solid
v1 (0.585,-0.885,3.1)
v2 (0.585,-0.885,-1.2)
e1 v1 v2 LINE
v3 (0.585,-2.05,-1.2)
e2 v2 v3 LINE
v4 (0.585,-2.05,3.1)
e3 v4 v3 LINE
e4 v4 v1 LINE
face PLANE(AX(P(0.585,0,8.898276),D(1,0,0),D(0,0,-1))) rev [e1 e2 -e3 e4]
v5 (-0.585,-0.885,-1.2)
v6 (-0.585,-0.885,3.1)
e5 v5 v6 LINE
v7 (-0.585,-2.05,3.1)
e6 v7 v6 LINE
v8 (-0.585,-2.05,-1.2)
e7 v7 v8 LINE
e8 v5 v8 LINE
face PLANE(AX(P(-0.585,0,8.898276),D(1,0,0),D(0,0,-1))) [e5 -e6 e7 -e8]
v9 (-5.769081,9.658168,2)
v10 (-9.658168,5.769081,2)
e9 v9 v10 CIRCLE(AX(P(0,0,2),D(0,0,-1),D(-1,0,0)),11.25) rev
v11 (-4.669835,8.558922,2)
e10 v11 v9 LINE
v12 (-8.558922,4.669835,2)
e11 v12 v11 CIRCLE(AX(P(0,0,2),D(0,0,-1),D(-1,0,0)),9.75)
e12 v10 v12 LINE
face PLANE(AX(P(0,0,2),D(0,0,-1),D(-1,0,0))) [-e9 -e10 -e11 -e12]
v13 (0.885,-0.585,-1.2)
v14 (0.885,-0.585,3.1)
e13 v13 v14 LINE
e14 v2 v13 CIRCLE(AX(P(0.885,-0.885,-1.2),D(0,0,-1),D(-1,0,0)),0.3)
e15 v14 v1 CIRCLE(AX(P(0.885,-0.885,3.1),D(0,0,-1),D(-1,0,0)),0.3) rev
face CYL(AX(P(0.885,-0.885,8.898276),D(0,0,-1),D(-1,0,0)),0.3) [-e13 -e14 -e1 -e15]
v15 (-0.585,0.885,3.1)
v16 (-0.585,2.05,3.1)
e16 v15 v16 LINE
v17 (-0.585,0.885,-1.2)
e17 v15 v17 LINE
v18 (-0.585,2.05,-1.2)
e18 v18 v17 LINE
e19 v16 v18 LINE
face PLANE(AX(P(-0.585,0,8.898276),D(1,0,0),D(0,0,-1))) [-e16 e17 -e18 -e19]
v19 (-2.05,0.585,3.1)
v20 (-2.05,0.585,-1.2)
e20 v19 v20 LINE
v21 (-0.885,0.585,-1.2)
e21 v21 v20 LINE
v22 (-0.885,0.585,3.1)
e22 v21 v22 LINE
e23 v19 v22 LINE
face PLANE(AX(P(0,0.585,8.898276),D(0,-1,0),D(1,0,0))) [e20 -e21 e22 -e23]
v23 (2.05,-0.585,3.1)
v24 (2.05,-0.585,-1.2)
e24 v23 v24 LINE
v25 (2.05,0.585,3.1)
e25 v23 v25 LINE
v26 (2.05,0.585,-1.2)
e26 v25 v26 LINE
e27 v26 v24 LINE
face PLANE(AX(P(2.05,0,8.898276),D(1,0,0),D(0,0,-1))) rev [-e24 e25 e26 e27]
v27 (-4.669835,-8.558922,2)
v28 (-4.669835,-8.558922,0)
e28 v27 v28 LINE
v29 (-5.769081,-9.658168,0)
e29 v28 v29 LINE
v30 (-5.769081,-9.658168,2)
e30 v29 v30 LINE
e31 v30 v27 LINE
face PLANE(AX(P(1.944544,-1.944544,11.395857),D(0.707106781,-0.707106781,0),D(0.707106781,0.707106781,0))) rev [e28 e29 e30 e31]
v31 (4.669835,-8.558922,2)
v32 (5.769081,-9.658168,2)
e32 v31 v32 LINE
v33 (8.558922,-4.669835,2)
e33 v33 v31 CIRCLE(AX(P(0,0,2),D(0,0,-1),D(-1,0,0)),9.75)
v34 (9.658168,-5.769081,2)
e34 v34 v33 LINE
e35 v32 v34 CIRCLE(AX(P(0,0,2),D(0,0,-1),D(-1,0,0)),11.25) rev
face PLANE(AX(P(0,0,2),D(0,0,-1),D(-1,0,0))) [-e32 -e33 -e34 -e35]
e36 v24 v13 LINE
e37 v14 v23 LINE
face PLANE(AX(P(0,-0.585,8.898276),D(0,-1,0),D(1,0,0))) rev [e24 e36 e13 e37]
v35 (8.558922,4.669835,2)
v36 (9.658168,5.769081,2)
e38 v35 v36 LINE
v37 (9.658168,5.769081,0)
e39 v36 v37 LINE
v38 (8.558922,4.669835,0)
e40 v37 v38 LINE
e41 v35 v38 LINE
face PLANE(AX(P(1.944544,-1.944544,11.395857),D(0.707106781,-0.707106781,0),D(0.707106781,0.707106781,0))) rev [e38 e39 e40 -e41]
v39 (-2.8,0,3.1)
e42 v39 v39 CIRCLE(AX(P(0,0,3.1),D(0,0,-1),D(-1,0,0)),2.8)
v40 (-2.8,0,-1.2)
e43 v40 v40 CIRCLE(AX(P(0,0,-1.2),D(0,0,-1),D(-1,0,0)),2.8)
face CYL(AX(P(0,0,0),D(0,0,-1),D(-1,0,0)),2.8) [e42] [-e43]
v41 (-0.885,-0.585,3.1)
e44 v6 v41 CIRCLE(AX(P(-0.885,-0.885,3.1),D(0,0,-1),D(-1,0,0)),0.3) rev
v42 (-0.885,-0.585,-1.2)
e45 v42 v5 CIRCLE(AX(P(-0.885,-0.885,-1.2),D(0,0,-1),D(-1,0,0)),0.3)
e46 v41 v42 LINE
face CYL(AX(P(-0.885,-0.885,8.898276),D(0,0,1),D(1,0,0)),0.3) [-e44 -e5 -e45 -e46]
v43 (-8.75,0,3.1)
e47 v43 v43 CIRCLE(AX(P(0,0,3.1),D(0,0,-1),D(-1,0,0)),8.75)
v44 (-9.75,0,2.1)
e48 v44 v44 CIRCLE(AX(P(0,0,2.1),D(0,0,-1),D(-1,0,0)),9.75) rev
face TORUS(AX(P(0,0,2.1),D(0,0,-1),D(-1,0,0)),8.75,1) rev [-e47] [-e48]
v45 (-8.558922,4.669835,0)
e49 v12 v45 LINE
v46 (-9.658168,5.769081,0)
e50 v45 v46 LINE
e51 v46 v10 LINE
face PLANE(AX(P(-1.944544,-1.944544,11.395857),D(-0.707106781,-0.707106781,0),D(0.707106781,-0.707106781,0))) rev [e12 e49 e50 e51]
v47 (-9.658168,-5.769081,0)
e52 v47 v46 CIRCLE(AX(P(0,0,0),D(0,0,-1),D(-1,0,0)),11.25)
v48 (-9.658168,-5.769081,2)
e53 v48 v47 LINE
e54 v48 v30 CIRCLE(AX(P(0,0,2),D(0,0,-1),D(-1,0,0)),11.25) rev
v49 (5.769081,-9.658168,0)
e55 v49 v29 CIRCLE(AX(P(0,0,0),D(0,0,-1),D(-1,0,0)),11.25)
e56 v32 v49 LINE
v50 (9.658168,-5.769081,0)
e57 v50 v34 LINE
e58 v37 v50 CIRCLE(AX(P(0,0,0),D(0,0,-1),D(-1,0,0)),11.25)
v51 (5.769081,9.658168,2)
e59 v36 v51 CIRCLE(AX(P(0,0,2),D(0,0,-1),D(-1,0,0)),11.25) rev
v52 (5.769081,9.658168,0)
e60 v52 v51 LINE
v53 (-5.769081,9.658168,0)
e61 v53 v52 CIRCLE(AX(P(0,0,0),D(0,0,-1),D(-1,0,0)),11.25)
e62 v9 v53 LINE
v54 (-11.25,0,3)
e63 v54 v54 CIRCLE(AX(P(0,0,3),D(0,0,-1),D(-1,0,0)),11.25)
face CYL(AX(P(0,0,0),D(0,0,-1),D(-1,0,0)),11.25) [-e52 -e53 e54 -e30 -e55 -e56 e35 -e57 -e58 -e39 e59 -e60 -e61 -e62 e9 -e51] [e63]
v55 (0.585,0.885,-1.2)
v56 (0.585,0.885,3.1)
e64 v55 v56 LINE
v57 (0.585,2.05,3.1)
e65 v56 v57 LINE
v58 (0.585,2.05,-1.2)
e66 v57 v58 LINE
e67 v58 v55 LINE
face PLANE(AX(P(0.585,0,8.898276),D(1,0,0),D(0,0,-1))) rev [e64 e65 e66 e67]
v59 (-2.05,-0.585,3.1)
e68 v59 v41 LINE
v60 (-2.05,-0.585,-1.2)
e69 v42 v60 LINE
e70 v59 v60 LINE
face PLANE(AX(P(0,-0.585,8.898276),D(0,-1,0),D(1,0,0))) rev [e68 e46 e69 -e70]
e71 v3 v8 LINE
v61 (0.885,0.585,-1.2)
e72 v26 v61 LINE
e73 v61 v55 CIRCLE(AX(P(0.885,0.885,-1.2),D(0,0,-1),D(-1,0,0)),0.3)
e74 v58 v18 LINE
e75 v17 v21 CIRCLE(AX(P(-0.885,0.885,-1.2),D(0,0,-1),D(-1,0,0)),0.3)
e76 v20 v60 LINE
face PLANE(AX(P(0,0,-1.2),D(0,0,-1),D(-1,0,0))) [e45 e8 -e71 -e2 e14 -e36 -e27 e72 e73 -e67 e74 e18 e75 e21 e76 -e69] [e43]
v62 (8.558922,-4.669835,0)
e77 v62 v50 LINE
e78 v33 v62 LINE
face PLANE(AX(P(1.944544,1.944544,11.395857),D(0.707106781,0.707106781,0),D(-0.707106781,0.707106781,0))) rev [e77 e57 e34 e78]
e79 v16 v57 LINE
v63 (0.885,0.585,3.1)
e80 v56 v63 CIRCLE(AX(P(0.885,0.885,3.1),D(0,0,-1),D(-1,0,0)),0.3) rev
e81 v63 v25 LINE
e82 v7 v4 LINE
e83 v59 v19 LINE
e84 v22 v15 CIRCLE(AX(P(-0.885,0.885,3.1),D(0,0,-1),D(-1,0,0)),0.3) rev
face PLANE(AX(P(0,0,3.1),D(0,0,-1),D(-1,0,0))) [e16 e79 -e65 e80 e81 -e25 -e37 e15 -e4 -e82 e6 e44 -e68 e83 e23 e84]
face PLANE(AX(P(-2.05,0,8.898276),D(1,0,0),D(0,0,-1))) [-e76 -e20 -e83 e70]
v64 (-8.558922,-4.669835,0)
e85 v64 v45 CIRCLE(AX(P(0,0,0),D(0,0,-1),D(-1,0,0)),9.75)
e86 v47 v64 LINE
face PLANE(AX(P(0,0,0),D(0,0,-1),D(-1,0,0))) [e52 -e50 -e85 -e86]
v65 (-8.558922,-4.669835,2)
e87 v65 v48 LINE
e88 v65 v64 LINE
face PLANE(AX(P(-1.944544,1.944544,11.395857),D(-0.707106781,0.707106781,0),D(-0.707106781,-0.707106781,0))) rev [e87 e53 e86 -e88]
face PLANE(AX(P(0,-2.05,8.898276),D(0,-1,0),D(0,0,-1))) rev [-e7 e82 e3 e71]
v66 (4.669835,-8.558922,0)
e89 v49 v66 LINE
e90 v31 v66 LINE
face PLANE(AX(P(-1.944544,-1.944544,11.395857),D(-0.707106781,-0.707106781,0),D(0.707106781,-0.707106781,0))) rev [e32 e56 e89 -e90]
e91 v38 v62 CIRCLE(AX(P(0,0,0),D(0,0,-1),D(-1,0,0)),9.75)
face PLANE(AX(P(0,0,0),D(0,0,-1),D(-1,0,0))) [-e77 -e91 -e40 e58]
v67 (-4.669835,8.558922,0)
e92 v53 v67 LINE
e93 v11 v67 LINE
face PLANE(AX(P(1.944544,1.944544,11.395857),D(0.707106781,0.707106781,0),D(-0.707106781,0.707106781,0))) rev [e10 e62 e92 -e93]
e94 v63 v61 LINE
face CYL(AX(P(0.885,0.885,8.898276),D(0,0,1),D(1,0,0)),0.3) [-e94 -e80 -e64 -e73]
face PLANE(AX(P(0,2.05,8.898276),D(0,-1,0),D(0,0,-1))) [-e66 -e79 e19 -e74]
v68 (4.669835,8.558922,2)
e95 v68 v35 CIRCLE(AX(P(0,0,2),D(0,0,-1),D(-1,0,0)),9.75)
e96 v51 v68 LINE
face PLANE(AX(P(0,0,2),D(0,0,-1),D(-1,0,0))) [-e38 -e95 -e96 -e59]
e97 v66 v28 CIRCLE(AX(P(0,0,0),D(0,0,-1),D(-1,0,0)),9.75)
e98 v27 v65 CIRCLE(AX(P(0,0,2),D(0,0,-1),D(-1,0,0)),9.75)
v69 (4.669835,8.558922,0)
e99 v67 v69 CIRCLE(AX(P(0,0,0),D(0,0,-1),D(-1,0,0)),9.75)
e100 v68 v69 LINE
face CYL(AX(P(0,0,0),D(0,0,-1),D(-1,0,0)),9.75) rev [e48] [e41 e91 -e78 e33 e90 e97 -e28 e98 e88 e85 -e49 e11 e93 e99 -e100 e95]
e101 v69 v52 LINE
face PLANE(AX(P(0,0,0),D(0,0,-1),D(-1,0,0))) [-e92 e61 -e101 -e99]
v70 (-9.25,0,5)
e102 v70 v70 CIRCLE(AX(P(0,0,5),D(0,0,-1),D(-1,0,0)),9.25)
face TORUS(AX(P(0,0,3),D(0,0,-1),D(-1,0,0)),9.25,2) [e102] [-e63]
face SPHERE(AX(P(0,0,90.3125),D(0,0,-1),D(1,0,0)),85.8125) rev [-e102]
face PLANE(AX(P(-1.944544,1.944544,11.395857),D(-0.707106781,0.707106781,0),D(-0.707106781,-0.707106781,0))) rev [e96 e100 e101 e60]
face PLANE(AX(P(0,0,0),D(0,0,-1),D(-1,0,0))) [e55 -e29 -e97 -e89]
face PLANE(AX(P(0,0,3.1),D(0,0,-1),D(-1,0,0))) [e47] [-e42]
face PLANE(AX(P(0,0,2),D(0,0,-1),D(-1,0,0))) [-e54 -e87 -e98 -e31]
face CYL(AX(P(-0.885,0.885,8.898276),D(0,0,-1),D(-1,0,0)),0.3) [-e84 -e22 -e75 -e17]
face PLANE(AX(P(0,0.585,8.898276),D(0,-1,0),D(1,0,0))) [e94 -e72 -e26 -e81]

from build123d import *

# Parameters (mm, degrees)
SKETCH1_W          = 6.95
SKETCH1_H          = 0.5
SKETCH1_W_2        = 2.8
SKETCH1_H_2        = 1.2
CUT_EXTRUDE2_START = 2
CUT_EXTRUDE2_DEPTH = 2
SKETCH3_W          = 1.17
SKETCH3_H          = 1.465
SKETCH3_H_2        = 1.17
SKETCH3_W_2        = 1.465
CUT_EXTRUDE3_DEPTH = 4.3
FILLET1_R          = 0.3
FILLET2_R          = 1
FILLET3_R          = 2


with BuildPart() as part:
    # Sketch1 → Revolve1 (revolve)
    with BuildSketch(Plane(origin=(0, 0, 0), x_dir=(1, 0, 0), z_dir=(0, 1, 0)), mode=Mode.PRIVATE) as revolve1_sk:
        with BuildLine():
            Line((2.8, 0), (0, 0))
            Line((0, 0), (0, -4.5))
            ThreePointArc((0, -4.5), (4.631751828, -4.625091174), (9.25, -5))
            Line((9.25, -5), (11.25, -5))
            Line((11.25, -5), (11.25, 0))
            Line((11.25, 0), (9.75, 0))
            Line((9.75, 0), (9.75, -3.1))
            Line((9.75, -3.1), (9.75, -3.6))
            Line((9.75, -3.6), (2.8, -3.6))
            Line((2.8, -3.6), (2.8, -3.1))
            Line((2.8, -3.1), (2.8, 0))
        make_face()
        with Locations((6.275, -3.35)):
            Rectangle(SKETCH1_W, SKETCH1_H)
        with Locations((1.4, 0.6)):
            Rectangle(SKETCH1_W_2, SKETCH1_H_2)
    revolve(revolve1_sk.sketch.rotate(Axis((0, 0, 0), (0, 0, 1)), 180), axis=Axis((0, 0, 0), (0, 0, 1)))

    # Sketch2 → Cut-Extrude2 (cut)
    with BuildSketch(Plane.XY.offset(CUT_EXTRUDE2_START)):
        with BuildLine():
            Line((8.558921926, 7.350980651), (7.350980651, 8.558921926))
            Line((7.350980651, 8.558921926), (4.669834629, 8.558921926))
            ThreePointArc((4.669834629, 8.558921926), (6.894291117, 6.894291117), (8.558921926, 4.669834629))
            Line((8.558921926, 4.669834629), (8.558921926, 7.350980651))
        make_face()
        Polygon((7.350980651, 8.558921926), (6.01040764, 9.899494937), (4.669834629, 8.558921926), align=None)
        Polygon((9.899494937, 6.01040764), (8.558921926, 7.350980651), (8.558921926, 4.669834629), align=None)
        Polygon((9.899494937, -6.01040764), (8.558921926, -4.669834629), (8.558921926, -7.350980651), align=None)
        with BuildLine():
            Line((8.558921926, -7.350980651), (8.558921926, -4.669834629))
            ThreePointArc((8.558921926, -4.669834629), (6.894291117, -6.894291117), (4.669834629, -8.558921926))
            Line((4.669834629, -8.558921926), (7.350980651, -8.558921926))
            Line((7.350980651, -8.558921926), (8.558921926, -7.350980651))
        make_face()
        Polygon((7.350980651, -8.558921926), (4.669834629, -8.558921926), (6.01040764, -9.899494937), align=None)
        Polygon((-6.01040764, -9.899494937), (-4.669834629, -8.558921926), (-7.350980651, -8.558921926), align=None)
        with BuildLine():
            ThreePointArc((-4.669834629, -8.558921926), (-6.894291117, -6.894291117), (-8.558921926, -4.669834629))
            Line((-8.558921926, -4.669834629), (-8.558921926, -7.350980651))
            Line((-8.558921926, -7.350980651), (-7.350980651, -8.558921926))
            Line((-7.350980651, -8.558921926), (-4.669834629, -8.558921926))
        make_face()
        Polygon((-8.558921926, -7.350980651), (-8.558921926, -4.669834629), (-9.899494937, -6.01040764), align=None)
        Polygon((-9.899494937, 6.01040764), (-8.558921926, 4.669834629), (-8.558921926, 7.350980651), align=None)
        with BuildLine():
            ThreePointArc((-8.558921926, 4.669834629), (-6.894291117, 6.894291117), (-4.669834629, 8.558921926))
            Line((-4.669834629, 8.558921926), (-7.350980651, 8.558921926))
            Line((-7.350980651, 8.558921926), (-8.558921926, 7.350980651))
            Line((-8.558921926, 7.350980651), (-8.558921926, 4.669834629))
        make_face()
        Polygon((-7.350980651, 8.558921926), (-4.669834629, 8.558921926), (-6.01040764, 9.899494937), align=None)
    extrude(amount=-CUT_EXTRUDE2_DEPTH, mode=Mode.SUBTRACT)

    # Sketch3 → Cut-Extrude3 (cut)
    with BuildSketch(Plane(origin=(0, 0, -1.2), x_dir=(-1, 0, 0), z_dir=(0, 0, -1))):
        with Locations((0, 1.3175)):
            Rectangle(SKETCH3_W, SKETCH3_H)
        Rectangle(SKETCH3_W, SKETCH3_H_2)
        with Locations((0, -1.3175)):
            Rectangle(SKETCH3_W, SKETCH3_H)
        with Locations((-1.3175, 0)):
            Rectangle(SKETCH3_W_2, SKETCH3_H_2)
        with Locations((1.3175, 0)):
            Rectangle(SKETCH3_W_2, SKETCH3_H_2)
    extrude(amount=-CUT_EXTRUDE3_DEPTH, mode=Mode.SUBTRACT)

    # Fillet1
    fillet1_edges = [part.edges().sort_by_distance(p)[0] for p in [
        (0.585, 0.585, 0.95),
        (0.585, -0.585, 0.95),
        (-0.585, -0.585, 0.95),
        (-0.585, 0.585, 0.95),
    ]]
    fillet(fillet1_edges, radius=FILLET1_R)

    # Fillet2
    fillet2_edges = [part.edges().sort_by_distance(p)[0] for p in [
        (9.75, 0, 3.1),
    ]]
    fillet(fillet2_edges, radius=FILLET2_R)

    # Fillet3
    fillet3_edges = [part.edges().sort_by_distance(p)[0] for p in [
        (11.25, 0, 5),
    ]]
    fillet(fillet3_edges, radius=FILLET3_R - 0.0001)  # a hair under: the kernel refuses the full size


solid = part.part
